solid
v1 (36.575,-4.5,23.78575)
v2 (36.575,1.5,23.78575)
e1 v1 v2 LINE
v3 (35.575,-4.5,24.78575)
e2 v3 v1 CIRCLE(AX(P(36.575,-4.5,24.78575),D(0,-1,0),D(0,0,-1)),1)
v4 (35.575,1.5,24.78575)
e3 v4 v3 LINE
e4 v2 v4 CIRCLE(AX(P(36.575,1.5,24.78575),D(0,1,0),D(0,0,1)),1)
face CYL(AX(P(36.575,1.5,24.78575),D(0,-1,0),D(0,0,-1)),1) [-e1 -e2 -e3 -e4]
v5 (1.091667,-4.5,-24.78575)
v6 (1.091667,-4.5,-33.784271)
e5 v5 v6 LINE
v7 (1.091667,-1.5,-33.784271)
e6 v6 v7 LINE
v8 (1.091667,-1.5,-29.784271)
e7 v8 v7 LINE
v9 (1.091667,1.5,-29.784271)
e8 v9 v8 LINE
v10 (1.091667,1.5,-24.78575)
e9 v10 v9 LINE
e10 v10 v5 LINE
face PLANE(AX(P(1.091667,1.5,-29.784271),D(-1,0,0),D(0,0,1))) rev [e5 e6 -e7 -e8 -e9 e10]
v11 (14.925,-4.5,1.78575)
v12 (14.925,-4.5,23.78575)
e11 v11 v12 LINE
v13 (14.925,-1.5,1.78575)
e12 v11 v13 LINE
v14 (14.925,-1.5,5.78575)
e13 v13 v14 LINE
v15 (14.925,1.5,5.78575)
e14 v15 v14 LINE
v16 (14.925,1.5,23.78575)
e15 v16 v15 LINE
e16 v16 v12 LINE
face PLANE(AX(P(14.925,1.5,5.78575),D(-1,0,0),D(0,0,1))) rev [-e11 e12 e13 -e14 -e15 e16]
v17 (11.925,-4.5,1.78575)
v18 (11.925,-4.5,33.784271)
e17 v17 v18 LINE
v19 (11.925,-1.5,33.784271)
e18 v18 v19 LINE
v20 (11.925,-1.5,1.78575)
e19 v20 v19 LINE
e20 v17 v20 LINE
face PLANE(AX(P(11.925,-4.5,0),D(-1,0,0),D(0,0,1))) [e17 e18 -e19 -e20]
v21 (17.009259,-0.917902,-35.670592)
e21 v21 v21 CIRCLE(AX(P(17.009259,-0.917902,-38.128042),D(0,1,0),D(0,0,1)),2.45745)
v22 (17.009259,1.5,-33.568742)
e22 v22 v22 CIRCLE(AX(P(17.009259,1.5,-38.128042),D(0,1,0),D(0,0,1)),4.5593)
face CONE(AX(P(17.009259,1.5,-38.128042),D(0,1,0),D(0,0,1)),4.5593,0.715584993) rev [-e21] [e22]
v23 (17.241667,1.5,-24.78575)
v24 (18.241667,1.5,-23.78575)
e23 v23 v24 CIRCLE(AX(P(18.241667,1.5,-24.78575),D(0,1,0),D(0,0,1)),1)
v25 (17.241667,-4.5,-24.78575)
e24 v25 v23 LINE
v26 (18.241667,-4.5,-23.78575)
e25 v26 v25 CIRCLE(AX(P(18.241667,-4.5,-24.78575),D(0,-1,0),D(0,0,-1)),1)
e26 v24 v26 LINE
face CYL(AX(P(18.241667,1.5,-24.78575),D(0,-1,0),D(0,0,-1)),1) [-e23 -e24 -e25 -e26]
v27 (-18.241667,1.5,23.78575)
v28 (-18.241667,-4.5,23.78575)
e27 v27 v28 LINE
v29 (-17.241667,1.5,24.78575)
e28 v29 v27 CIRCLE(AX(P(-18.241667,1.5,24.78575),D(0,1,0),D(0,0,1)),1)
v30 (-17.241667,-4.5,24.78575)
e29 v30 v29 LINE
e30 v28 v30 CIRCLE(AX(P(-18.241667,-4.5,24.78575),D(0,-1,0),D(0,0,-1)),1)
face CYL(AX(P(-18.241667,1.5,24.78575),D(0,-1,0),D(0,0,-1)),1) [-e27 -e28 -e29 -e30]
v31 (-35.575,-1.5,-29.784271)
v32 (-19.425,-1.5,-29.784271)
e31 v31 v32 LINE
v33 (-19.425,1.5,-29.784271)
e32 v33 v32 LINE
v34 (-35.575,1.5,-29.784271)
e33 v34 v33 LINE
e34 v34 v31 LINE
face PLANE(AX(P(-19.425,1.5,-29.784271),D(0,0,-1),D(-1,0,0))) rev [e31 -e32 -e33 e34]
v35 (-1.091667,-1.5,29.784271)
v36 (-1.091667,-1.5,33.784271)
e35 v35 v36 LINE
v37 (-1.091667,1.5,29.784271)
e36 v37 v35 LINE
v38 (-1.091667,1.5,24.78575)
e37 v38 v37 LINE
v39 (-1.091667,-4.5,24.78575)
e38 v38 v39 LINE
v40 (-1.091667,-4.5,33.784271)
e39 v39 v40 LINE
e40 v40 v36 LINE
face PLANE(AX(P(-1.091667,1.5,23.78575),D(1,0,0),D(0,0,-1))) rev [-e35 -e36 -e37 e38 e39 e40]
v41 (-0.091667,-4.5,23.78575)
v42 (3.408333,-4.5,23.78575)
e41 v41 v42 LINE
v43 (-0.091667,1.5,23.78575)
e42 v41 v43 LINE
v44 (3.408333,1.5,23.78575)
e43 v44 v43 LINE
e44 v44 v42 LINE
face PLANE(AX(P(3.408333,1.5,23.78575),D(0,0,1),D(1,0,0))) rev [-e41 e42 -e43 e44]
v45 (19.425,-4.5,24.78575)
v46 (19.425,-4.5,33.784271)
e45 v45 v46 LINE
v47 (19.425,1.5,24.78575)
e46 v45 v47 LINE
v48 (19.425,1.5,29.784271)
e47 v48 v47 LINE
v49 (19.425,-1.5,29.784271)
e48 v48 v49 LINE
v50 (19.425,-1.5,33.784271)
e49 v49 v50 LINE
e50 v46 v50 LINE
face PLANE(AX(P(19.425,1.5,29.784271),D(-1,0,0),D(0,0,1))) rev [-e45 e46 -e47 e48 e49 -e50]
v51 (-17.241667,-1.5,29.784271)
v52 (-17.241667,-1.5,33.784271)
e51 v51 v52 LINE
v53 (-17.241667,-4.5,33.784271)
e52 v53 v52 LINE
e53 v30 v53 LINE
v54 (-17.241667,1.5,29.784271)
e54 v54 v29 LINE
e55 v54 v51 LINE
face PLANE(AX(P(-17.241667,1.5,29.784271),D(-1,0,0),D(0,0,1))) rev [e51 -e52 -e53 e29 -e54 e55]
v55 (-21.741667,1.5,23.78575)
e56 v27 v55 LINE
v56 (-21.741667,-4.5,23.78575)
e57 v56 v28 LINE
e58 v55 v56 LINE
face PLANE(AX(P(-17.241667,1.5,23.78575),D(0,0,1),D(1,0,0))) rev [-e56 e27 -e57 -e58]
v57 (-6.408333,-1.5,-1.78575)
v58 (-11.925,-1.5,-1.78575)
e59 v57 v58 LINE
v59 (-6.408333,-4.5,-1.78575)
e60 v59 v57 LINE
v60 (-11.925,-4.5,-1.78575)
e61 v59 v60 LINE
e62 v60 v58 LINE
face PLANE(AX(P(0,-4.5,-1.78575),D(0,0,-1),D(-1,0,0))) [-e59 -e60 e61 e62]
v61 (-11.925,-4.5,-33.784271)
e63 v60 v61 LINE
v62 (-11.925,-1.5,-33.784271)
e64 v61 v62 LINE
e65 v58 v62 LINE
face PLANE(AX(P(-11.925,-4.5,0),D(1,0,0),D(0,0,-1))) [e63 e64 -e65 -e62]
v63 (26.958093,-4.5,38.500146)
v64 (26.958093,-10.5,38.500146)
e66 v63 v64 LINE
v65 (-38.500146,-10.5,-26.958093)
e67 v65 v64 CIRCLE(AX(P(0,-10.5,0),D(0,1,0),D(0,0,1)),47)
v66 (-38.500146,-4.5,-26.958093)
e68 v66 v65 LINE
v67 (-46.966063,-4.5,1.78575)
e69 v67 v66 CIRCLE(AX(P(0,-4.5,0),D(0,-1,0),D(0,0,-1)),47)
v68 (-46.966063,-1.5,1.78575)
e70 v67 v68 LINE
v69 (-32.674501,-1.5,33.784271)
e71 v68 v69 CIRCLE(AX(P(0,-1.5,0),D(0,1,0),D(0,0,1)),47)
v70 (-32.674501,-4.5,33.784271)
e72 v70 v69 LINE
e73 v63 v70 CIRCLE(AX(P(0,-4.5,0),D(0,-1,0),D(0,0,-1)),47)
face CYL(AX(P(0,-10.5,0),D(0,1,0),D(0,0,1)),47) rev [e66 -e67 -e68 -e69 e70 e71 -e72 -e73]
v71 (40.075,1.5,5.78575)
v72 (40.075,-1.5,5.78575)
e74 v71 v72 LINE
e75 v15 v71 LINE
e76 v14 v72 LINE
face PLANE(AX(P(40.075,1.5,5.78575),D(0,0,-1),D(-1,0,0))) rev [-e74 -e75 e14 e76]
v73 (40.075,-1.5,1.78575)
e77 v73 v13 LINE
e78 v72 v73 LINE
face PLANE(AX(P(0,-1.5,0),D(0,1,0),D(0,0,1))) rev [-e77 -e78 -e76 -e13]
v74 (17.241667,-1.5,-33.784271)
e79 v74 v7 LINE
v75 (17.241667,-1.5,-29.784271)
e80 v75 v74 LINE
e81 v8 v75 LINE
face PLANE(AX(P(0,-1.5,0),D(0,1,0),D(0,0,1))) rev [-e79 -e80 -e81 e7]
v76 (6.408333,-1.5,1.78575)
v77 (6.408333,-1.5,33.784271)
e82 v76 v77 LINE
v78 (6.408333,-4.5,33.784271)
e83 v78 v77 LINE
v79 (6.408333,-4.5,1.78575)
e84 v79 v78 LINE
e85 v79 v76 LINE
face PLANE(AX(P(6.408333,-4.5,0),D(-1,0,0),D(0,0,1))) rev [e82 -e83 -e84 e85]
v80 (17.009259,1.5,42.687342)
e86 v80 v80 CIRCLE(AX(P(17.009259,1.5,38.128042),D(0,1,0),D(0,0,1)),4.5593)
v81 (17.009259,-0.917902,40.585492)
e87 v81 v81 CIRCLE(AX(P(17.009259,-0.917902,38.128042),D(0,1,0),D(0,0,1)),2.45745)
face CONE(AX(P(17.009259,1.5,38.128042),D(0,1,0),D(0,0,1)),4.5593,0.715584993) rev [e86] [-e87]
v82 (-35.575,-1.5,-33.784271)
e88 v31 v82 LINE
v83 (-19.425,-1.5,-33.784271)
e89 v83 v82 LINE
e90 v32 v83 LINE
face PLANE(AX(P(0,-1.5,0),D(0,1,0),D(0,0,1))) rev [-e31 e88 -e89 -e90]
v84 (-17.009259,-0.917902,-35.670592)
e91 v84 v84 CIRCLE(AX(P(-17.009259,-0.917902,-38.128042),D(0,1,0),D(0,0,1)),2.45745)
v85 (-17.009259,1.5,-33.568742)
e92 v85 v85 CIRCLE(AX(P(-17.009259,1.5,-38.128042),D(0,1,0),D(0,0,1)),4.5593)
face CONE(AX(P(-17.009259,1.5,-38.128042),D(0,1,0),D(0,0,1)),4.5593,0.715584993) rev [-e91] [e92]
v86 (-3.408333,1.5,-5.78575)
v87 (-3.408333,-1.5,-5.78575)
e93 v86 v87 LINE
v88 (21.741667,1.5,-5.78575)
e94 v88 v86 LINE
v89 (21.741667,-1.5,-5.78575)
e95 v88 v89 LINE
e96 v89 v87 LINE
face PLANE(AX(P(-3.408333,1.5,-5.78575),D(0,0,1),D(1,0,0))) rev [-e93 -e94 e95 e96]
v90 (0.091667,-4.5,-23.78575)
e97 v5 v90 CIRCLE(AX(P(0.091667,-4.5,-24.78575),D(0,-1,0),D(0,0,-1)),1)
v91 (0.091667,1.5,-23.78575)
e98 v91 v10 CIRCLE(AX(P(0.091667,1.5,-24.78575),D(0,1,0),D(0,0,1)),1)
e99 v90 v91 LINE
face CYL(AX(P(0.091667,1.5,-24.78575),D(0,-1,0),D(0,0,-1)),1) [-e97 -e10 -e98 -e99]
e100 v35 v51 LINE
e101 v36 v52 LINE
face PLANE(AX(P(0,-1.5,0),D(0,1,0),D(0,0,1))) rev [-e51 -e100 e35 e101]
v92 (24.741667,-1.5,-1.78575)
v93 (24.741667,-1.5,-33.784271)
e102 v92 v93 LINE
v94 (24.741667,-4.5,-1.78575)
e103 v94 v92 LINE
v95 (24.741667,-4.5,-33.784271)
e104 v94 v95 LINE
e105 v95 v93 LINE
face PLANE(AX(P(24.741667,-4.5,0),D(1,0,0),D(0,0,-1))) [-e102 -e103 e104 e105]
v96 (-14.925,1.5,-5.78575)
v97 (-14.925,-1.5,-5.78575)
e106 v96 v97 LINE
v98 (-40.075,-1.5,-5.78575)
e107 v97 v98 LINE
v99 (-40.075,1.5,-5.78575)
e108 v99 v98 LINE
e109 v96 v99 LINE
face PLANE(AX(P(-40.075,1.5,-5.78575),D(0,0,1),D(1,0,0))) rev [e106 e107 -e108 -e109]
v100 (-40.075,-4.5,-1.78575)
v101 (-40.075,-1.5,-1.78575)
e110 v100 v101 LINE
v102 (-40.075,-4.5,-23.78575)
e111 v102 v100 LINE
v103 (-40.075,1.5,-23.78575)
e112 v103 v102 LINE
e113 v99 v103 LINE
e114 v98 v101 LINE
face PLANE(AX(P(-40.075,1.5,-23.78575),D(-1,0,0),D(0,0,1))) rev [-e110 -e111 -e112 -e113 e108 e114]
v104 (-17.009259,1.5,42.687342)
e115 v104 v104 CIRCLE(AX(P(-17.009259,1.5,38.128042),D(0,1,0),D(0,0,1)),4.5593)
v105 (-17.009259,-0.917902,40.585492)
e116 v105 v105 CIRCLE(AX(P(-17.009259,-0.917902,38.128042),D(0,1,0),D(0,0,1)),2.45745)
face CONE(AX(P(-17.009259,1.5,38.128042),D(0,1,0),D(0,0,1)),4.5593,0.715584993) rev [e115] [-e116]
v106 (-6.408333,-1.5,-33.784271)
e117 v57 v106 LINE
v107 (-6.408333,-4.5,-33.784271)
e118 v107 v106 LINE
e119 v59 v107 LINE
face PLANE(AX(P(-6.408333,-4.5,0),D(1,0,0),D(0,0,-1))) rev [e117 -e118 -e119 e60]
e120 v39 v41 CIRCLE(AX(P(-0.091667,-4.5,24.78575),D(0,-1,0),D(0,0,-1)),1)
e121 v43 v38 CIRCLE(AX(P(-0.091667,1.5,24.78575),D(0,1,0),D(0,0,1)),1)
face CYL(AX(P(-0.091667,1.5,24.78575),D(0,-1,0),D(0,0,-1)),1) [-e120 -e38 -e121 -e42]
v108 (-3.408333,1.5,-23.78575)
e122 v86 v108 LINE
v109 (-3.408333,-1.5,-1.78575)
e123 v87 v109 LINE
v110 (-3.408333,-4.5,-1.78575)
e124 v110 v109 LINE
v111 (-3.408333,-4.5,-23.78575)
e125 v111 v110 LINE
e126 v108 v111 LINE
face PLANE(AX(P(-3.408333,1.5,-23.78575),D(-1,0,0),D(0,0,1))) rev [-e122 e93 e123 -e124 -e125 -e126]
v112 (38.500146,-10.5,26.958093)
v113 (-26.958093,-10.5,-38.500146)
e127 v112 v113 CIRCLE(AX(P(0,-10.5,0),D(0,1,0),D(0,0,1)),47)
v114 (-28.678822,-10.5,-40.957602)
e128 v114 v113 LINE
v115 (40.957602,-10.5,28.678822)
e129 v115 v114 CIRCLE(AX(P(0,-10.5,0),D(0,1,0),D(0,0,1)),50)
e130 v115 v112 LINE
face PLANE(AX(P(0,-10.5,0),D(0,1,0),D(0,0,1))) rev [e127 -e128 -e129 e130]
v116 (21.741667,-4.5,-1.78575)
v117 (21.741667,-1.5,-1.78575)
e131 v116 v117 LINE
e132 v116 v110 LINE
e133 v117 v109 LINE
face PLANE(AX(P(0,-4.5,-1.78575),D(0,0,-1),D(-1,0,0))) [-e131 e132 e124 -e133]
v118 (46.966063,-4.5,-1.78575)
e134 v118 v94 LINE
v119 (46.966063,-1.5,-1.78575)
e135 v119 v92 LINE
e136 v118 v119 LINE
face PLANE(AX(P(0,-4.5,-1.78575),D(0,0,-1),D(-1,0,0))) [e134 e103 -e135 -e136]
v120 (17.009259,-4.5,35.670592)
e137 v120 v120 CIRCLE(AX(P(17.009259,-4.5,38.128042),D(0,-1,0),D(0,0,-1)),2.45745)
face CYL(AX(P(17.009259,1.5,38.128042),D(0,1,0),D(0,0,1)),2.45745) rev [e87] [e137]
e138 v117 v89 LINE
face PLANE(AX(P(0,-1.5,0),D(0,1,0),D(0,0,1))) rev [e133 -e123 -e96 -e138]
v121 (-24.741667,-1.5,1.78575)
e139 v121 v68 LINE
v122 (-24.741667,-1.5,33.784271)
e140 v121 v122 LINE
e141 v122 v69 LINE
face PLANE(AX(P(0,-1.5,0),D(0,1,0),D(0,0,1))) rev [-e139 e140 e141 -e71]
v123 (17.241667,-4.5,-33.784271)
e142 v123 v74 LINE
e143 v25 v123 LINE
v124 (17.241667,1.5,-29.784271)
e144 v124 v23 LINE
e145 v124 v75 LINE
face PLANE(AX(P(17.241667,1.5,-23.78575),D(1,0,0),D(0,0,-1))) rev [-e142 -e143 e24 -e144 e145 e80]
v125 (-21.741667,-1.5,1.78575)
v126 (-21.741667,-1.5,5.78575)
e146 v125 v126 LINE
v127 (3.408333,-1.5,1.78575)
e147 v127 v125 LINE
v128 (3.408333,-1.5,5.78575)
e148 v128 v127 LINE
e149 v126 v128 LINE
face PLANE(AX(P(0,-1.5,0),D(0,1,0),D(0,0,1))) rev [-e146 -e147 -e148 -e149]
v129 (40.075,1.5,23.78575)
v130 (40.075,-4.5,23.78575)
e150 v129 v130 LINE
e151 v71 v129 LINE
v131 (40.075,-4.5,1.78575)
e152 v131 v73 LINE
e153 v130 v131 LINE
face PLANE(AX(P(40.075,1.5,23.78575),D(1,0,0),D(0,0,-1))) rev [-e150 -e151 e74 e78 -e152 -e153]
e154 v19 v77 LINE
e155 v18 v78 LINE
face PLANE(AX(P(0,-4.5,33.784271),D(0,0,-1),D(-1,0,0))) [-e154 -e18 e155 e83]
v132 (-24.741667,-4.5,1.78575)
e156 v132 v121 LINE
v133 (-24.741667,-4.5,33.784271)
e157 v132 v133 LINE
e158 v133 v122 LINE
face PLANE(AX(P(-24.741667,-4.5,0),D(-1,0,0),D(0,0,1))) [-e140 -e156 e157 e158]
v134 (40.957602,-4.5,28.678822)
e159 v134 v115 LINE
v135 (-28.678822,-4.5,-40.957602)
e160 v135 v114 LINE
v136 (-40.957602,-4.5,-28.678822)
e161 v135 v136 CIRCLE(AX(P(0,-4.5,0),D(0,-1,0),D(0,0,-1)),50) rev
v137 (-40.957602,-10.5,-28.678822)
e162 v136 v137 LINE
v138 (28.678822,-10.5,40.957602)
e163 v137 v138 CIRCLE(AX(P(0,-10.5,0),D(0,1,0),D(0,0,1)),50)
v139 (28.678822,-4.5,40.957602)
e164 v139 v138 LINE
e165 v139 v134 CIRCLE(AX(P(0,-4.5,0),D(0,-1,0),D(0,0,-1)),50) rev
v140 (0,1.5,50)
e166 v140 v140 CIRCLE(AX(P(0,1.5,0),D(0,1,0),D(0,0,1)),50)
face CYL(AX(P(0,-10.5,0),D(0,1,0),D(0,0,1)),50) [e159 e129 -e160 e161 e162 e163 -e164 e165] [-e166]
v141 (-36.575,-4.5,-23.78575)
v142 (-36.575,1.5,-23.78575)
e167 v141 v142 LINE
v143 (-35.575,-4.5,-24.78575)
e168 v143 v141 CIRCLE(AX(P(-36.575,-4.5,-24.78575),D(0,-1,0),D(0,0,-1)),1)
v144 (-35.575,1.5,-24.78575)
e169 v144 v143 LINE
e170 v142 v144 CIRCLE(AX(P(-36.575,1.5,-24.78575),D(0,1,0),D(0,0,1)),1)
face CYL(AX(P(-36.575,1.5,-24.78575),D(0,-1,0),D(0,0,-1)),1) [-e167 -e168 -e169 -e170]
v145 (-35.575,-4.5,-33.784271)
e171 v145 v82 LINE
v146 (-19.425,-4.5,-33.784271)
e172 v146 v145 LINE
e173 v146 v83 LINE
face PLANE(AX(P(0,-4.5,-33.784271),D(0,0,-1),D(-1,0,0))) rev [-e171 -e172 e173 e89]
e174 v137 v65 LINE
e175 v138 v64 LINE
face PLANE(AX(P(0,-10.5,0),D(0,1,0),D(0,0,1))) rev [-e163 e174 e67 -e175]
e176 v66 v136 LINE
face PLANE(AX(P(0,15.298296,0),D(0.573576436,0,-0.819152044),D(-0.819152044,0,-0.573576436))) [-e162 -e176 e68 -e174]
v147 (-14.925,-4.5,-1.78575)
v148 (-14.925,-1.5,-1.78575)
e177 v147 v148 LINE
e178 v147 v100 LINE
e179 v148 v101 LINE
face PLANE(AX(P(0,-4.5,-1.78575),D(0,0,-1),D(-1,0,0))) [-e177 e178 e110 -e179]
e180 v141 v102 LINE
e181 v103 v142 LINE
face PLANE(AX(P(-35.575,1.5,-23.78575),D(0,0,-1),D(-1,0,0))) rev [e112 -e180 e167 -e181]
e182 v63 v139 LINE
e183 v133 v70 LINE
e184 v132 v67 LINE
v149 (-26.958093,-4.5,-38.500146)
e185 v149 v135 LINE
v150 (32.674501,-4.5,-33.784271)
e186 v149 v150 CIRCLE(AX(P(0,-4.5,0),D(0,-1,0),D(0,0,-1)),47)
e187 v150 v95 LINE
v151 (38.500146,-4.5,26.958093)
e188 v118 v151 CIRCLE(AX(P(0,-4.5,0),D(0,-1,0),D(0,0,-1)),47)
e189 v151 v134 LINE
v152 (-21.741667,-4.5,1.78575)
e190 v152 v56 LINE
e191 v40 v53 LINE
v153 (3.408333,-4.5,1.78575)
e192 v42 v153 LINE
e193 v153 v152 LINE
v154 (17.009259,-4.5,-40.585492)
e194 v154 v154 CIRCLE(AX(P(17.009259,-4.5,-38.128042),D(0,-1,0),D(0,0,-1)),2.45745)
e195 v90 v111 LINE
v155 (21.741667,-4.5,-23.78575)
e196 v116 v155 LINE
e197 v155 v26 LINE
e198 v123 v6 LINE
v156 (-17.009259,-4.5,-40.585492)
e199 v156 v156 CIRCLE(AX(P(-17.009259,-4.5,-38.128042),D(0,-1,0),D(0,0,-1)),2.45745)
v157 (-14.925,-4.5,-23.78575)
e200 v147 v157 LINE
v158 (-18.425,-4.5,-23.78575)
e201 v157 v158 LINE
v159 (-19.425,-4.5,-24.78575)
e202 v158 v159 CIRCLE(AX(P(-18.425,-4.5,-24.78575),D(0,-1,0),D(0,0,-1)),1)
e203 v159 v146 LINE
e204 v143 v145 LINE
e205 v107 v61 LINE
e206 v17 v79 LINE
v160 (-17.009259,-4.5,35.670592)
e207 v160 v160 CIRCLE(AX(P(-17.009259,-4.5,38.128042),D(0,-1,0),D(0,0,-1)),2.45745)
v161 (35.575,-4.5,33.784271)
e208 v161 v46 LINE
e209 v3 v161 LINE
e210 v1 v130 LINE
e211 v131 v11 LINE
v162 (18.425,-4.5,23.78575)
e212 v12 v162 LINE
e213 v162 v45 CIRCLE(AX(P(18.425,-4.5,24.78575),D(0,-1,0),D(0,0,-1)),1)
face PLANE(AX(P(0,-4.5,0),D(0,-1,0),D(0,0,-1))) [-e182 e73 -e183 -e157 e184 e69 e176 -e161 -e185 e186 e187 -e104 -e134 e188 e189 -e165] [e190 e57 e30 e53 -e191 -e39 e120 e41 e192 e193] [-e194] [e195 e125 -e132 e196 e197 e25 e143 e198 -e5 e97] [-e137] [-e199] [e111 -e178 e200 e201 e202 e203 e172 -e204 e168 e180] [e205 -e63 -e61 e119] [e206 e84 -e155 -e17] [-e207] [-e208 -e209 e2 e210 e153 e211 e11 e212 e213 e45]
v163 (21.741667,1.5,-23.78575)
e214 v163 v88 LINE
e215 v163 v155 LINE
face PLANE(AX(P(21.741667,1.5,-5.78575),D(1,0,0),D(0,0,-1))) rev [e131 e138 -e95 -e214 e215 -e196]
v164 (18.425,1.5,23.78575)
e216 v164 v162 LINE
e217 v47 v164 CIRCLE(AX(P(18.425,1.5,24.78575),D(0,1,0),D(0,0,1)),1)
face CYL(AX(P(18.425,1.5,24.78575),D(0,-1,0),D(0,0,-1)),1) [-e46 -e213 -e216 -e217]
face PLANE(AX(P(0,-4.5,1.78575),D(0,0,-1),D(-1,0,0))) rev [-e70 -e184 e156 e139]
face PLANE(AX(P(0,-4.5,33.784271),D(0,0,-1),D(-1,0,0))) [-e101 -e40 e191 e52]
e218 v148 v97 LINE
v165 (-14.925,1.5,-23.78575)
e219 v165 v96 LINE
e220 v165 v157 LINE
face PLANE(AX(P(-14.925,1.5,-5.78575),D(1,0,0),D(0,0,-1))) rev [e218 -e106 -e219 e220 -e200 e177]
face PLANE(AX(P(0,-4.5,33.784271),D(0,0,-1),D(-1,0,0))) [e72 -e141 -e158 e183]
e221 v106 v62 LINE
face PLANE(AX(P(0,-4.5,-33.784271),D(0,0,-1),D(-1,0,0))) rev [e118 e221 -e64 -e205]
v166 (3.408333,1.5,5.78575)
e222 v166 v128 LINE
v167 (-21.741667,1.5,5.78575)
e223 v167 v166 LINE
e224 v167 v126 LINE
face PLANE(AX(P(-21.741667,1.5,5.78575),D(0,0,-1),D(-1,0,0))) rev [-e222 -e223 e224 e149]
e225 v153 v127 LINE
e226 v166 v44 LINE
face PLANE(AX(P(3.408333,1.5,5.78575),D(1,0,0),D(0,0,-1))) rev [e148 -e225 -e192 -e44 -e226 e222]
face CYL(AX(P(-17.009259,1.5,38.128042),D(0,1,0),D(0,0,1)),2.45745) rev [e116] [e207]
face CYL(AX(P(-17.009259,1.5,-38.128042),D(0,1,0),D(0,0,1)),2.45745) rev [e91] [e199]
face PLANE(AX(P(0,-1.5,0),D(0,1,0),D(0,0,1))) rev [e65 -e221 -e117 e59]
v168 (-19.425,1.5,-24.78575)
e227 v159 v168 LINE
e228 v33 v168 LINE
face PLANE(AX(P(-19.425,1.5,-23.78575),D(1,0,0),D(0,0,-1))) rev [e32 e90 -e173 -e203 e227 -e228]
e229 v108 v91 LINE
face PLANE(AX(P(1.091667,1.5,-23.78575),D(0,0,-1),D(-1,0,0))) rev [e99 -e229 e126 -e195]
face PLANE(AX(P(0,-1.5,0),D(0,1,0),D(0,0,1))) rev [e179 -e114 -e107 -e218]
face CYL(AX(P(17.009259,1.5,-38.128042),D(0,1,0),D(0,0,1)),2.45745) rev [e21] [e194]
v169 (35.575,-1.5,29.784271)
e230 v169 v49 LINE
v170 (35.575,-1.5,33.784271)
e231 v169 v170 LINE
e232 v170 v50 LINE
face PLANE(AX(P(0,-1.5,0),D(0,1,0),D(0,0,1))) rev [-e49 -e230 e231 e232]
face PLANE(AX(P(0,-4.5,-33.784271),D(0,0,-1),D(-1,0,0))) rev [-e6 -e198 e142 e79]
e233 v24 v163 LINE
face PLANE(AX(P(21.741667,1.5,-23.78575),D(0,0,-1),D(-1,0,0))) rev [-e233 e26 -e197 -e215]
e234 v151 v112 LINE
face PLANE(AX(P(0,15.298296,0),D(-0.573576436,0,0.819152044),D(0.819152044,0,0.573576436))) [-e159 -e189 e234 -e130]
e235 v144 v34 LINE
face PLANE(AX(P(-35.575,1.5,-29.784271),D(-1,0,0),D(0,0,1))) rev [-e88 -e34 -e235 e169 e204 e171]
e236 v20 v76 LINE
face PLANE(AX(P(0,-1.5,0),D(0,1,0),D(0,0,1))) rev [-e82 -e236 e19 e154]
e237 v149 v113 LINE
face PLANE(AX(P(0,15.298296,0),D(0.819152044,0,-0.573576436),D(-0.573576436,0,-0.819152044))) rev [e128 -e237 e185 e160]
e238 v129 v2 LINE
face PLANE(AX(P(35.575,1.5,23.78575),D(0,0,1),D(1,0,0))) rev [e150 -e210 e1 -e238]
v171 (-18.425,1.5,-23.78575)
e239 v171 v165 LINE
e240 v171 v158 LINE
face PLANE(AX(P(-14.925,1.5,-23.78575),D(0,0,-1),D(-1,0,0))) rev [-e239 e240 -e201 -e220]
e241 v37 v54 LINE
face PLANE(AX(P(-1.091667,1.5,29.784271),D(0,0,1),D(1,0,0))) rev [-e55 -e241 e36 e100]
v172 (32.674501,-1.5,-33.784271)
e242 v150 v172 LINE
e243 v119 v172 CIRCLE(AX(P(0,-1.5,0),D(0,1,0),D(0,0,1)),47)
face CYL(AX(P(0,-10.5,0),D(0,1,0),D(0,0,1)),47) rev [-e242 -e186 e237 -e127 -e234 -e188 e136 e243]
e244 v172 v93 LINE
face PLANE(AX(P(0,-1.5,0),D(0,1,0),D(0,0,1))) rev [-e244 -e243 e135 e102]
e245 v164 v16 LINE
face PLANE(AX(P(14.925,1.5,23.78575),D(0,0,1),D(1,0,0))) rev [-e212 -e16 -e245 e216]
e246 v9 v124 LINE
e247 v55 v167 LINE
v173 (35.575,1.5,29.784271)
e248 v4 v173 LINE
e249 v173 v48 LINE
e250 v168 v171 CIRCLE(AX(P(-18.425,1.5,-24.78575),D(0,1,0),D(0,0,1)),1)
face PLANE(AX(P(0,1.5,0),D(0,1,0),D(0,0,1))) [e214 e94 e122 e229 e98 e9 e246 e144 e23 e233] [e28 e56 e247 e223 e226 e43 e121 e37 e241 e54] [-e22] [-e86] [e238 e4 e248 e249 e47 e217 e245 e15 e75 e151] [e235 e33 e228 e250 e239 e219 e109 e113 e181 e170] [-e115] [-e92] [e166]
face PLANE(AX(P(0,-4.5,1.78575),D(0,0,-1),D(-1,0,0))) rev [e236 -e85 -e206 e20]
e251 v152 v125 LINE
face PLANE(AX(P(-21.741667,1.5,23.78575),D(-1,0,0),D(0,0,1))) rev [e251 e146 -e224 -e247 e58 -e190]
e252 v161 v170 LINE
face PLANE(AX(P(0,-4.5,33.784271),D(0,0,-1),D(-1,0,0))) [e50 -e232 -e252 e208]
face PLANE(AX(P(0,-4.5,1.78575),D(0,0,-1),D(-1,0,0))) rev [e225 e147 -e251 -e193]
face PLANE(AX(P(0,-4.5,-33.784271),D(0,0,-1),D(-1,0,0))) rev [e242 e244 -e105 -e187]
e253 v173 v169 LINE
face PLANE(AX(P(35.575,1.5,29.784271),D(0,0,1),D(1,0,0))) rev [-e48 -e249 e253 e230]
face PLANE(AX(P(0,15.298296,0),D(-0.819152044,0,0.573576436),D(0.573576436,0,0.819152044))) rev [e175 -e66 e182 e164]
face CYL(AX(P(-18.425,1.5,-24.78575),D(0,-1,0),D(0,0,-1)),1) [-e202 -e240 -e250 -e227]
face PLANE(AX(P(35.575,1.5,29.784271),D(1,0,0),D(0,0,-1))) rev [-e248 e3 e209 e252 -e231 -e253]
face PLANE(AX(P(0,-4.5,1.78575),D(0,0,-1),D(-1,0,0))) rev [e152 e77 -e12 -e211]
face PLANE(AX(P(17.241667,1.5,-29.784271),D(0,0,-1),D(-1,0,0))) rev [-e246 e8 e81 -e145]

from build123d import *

# Parameters (mm, degrees)
A_BASE_T_START                                    = -1.5
A_BASE_T_OUTLINE_R                                = 47
A_BASE_T_OUTLINE_R_2                              = 1
A_BASE_T_DEPTH                                    = 3
OUTER_START                                       = -12
SKETCH2_R                                         = 50
SKETCH2_R_2                                       = 47
OUTER_RING_DEPTH                                  = 12
FINGER_BASE_THROUGH_HOLES_DEPTH                   = 72.281133549
RING_EXTRUDE_OUTLINE_R                            = 1
RING_EXTRUDE_OUTLINE_W                            = 5.516666665
RING_EXTRUDE_OUTLINE_H                            = 31.998521247
RING_EXTRUDE_OUTLINE_W_2                          = 5.516666664
RING_EXTRUDE_DEPTH                                = 3
SKETCH6_W                                         = 16.15
SKETCH6_H                                         = 4
ALLOWANCE_CUT_1_DEPTH                             = 72.281133549
ALLOWANCE_CUT_2_DEPTH                             = 6
CSK_FOR_8_FLAT_HEAD_SOCKET_CAP_SCREW1_D           = 4.9149
CSK_FOR_8_FLAT_HEAD_SOCKET_CAP_SCREW1_CSINK_D     = 9.1186
CSK_FOR_8_FLAT_HEAD_SOCKET_CAP_SCREW1_CSINK_ANGLE = 82
CLEARANCE_CONTOURING_R                            = 1


# Read off the part's stored shape, not the designer's step: a_base_t, Ring Extrude
with BuildPart() as part:
    # a_base_t outline → a_base_t (new body)
    with BuildSketch(Plane(origin=(0, 0, 0), x_dir=(1, 0, 0), z_dir=(0, 1, 0)).offset(A_BASE_T_START)):
        Circle(A_BASE_T_OUTLINE_R)
        with Locations((-17.009259258, -38.128042167)):
            Circle(A_BASE_T_OUTLINE_R_2, mode=Mode.SUBTRACT)
        with Locations((-9.166666665, -28.284271247)):
            Circle(A_BASE_T_OUTLINE_R_2, mode=Mode.SUBTRACT)
        with Locations((17.009259258, -38.128042167)):
            Circle(A_BASE_T_OUTLINE_R_2, mode=Mode.SUBTRACT)
        with Locations((27.5, -28.284271247)):
            Circle(A_BASE_T_OUTLINE_R_2, mode=Mode.SUBTRACT)
        with Locations((-27.5, 28.284271247)):
            Circle(A_BASE_T_OUTLINE_R_2, mode=Mode.SUBTRACT)
        with Locations((-17.009259258, 38.128042167)):
            Circle(A_BASE_T_OUTLINE_R_2, mode=Mode.SUBTRACT)
        with Locations((9.166666665, 28.284271247)):
            Circle(A_BASE_T_OUTLINE_R_2, mode=Mode.SUBTRACT)
        with Locations((17.009259258, 38.128042167)):
            Circle(A_BASE_T_OUTLINE_R_2, mode=Mode.SUBTRACT)
    extrude(amount=A_BASE_T_DEPTH)

    # Sketch2 → Outer Ring (add)
    with BuildSketch(Plane(origin=(0, 1.5, 0), x_dir=(1, 0, 0), z_dir=(0, 1, 0)).offset(OUTER_START)):
        with Locations(Location((0, 0, 0), (0, 0, 270))):
            Circle(SKETCH2_R)
        with Locations(Location((0, 0, 0), (0, 0, 270))):
            Circle(SKETCH2_R_2, mode=Mode.SUBTRACT)
    extrude(amount=OUTER_RING_DEPTH)

    # Sketch3 → Finger Base Through Holes (cut, through all)
    with BuildSketch(Plane.XZ.offset(1.5)):
        Polygon((35.574999997, 23.78575), (40.074999997, 23.78575), (40.074999997, 5.78575), (14.924999997, 5.78575), (14.924999997, 23.78575), (19.424999997, 23.78575), (19.424999997, 29.784271247), (35.574999997, 29.784271247), align=None)
        Polygon((-1.091666667, 29.784271247), (-17.241666667, 29.784271247), (-17.241666667, 23.78575), (-21.741666667, 23.78575), (-21.741666667, 5.78575), (3.408333333, 5.78575), (3.408333333, 23.78575), (-1.091666667, 23.78575), align=None)
        Polygon((17.241666665, -29.784271247), (1.091666665, -29.784271247), (1.091666665, -23.78575), (-3.408333335, -23.78575), (-3.408333335, -5.78575), (21.741666665, -5.78575), (21.741666665, -23.78575), (17.241666665, -23.78575), align=None)
        Polygon((-19.425, -29.784271247), (-35.575, -29.784271247), (-35.575, -23.78575), (-40.075, -23.78575), (-40.075, -5.78575), (-14.925, -5.78575), (-14.925, -23.78575), (-19.425, -23.78575), align=None)
    extrude(amount=-FINGER_BASE_THROUGH_HOLES_DEPTH, mode=Mode.SUBTRACT)

    # Ring Extrude outline → Ring Extrude (add)
    with BuildSketch(Plane.XZ.offset(1.5)):
        with BuildLine():
            Line((35.574999997, 30.715132674), (35.574999997, 23.78575))
            Line((35.574999997, 23.78575), (40.074999997, 23.78575))
            Line((40.074999997, 23.78575), (40.074999997, 1.78575))
            Line((40.074999997, 1.78575), (14.924999997, 1.78575))
            Line((14.924999997, 1.78575), (14.924999997, 23.78575))
            Line((14.924999997, 23.78575), (19.424999997, 23.78575))
            Line((19.424999997, 23.78575), (19.424999997, 33.784271247))
            Line((19.424999997, 33.784271247), (32.67450101, 33.784271247))
            ThreePointArc((32.67450101, 33.784271247), (0, 47), (-32.67450101, 33.784271247))
            Line((-32.67450101, 33.784271247), (-24.741666667, 33.784271247))
            Line((-24.741666667, 33.784271247), (-24.741666667, 1.78575))
            Line((-24.741666667, 1.78575), (-46.966063247, 1.78575))
            ThreePointArc((-46.966063247, 1.78575), (-44.354634753, -15.545622403), (-35.575, -30.715132671))
            Line((-35.575, -30.715132671), (-35.575, -23.78575))
            Line((-35.575, -23.78575), (-40.075, -23.78575))
            Line((-40.075, -23.78575), (-40.075, -1.78575))
            Line((-40.075, -1.78575), (-14.925, -1.78575))
            Line((-14.925, -1.78575), (-14.925, -23.78575))
            Line((-14.925, -23.78575), (-19.425, -23.78575))
            Line((-19.425, -23.78575), (-19.425, -33.784271247))
            Line((-19.425, -33.784271247), (-32.67450101, -33.784271247))
            ThreePointArc((-32.67450101, -33.784271247), (0, -47), (32.67450101, -33.784271247))
            Line((32.67450101, -33.784271247), (24.741666665, -33.784271247))
            Line((24.741666665, -33.784271247), (24.741666665, -1.78575))
            Line((24.741666665, -1.78575), (46.966063247, -1.78575))
            ThreePointArc((46.966063247, -1.78575), (44.354634753, 15.545622405), (35.574999997, 30.715132674))
        make_face()
        with Locations((-17.009259258, -38.128042167)):
            Circle(RING_EXTRUDE_OUTLINE_R, mode=Mode.SUBTRACT)
        with Locations((-9.166666667, -17.785010623)):
            Rectangle(RING_EXTRUDE_OUTLINE_W, RING_EXTRUDE_OUTLINE_H, mode=Mode.SUBTRACT)
        with Locations((17.009259258, -38.128042167)):
            Circle(RING_EXTRUDE_OUTLINE_R, mode=Mode.SUBTRACT)
        Polygon((17.241666665, -23.78575), (17.241666665, -33.784271247), (1.091666665, -33.784271247), (1.091666665, -23.78575), (-3.408333335, -23.78575), (-3.408333335, -1.78575), (21.741666665, -1.78575), (21.741666665, -23.78575), align=None, mode=Mode.SUBTRACT)
        Polygon((-1.091666667, 23.78575), (3.408333333, 23.78575), (3.408333333, 1.78575), (-21.741666667, 1.78575), (-21.741666667, 23.78575), (-17.241666667, 23.78575), (-17.241666667, 33.784271247), (-1.091666667, 33.784271247), align=None, mode=Mode.SUBTRACT)
        with Locations((-17.009259258, 38.128042167)):
            Circle(RING_EXTRUDE_OUTLINE_R, mode=Mode.SUBTRACT)
        with Locations((9.166666665, 17.785010623)):
            Rectangle(RING_EXTRUDE_OUTLINE_W_2, RING_EXTRUDE_OUTLINE_H, mode=Mode.SUBTRACT)
        with Locations((17.009259258, 38.128042167)):
            Circle(RING_EXTRUDE_OUTLINE_R, mode=Mode.SUBTRACT)
    extrude(amount=RING_EXTRUDE_DEPTH)

    # Sketch6 → Allowance Cut 1 (cut, through all)
    with BuildSketch(Plane.XZ.offset(1.5)):
        with Locations((27.499999997, 31.784271247)):
            Rectangle(SKETCH6_W, SKETCH6_H)
        with Locations((-27.5, -31.784271247)):
            Rectangle(SKETCH6_W, SKETCH6_H)
    extrude(amount=ALLOWANCE_CUT_1_DEPTH, mode=Mode.SUBTRACT)

    # Sketch7 → Allowance Cut 2 (cut)
    with BuildSketch(Plane.XZ.offset(10.5)):
        with BuildLine():
            Line((-38.500146082, -26.958092508), (-40.957602214, -28.678821818))
            ThreePointArc((-40.957602214, -28.678821818), (-35.355339059, -35.355339059), (-28.678821818, -40.957602214))
            Line((-28.678821818, -40.957602214), (-26.958092508, -38.500146082))
            ThreePointArc((-26.958092508, -38.500146082), (-29.909386843, -36.25504901), (-32.67450101, -33.784271247))
            Line((-32.67450101, -33.784271247), (-35.575, -33.784271247))
            Line((-35.575, -33.784271247), (-35.575, -30.715132671))
            ThreePointArc((-35.575, -30.715132671), (-37.085181063, -28.873679114), (-38.500146082, -26.958092508))
        make_face()
        with BuildLine():
            ThreePointArc((40.957602214, 28.678821818), (35.355339059, 35.355339059), (28.678821818, 40.957602214))
            Line((28.678821818, 40.957602214), (26.958092508, 38.500146082))
            ThreePointArc((26.958092508, 38.500146082), (29.909386843, 36.25504901), (32.67450101, 33.784271247))
            Line((32.67450101, 33.784271247), (35.574999997, 33.784271247))
            Line((35.574999997, 33.784271247), (35.574999997, 30.715132674))
            ThreePointArc((35.574999997, 30.715132674), (37.085181061, 28.873679115), (38.500146082, 26.958092508))
            Line((38.500146082, 26.958092508), (40.957602214, 28.678821818))
        make_face()
    extrude(amount=-ALLOWANCE_CUT_2_DEPTH, mode=Mode.SUBTRACT)

    # CSK for #8 Flat Head Socket Cap Screw1 (through all)
    with Locations(Plane(origin=(0, 1.5, 0), x_dir=(1, 0, 0), z_dir=(0, 1, 0))):
        with Locations((-17.009259258, -38.128042167), (17.009259258, -38.128042167), (17.009259258, 38.128042167), (-17.009259258, 38.128042167)):
            CounterSinkHole(CSK_FOR_8_FLAT_HEAD_SOCKET_CAP_SCREW1_D / 2, CSK_FOR_8_FLAT_HEAD_SOCKET_CAP_SCREW1_CSINK_D / 2, counter_sink_angle=CSK_FOR_8_FLAT_HEAD_SOCKET_CAP_SCREW1_CSINK_ANGLE)

    # Clearance Contouring
    clearance_contouring_edges = [part.edges().sort_by_distance(p)[0] for p in [
        (17.241666665, -1.5, -23.78575),
        (1.091666665, -1.5, -23.78575),
        (-19.425, -1.5, -23.78575),
        (-35.575, -1.5, -23.78575),
        (35.574999997, 0, 23.78575),
        (19.424999997, 0, 23.78575),
        (-1.091666667, 0, 23.78575),
        (-17.241666667, 0, 23.78575),
    ]]
    fillet(clearance_contouring_edges, radius=CLEARANCE_CONTOURING_R)


solid = part.part
